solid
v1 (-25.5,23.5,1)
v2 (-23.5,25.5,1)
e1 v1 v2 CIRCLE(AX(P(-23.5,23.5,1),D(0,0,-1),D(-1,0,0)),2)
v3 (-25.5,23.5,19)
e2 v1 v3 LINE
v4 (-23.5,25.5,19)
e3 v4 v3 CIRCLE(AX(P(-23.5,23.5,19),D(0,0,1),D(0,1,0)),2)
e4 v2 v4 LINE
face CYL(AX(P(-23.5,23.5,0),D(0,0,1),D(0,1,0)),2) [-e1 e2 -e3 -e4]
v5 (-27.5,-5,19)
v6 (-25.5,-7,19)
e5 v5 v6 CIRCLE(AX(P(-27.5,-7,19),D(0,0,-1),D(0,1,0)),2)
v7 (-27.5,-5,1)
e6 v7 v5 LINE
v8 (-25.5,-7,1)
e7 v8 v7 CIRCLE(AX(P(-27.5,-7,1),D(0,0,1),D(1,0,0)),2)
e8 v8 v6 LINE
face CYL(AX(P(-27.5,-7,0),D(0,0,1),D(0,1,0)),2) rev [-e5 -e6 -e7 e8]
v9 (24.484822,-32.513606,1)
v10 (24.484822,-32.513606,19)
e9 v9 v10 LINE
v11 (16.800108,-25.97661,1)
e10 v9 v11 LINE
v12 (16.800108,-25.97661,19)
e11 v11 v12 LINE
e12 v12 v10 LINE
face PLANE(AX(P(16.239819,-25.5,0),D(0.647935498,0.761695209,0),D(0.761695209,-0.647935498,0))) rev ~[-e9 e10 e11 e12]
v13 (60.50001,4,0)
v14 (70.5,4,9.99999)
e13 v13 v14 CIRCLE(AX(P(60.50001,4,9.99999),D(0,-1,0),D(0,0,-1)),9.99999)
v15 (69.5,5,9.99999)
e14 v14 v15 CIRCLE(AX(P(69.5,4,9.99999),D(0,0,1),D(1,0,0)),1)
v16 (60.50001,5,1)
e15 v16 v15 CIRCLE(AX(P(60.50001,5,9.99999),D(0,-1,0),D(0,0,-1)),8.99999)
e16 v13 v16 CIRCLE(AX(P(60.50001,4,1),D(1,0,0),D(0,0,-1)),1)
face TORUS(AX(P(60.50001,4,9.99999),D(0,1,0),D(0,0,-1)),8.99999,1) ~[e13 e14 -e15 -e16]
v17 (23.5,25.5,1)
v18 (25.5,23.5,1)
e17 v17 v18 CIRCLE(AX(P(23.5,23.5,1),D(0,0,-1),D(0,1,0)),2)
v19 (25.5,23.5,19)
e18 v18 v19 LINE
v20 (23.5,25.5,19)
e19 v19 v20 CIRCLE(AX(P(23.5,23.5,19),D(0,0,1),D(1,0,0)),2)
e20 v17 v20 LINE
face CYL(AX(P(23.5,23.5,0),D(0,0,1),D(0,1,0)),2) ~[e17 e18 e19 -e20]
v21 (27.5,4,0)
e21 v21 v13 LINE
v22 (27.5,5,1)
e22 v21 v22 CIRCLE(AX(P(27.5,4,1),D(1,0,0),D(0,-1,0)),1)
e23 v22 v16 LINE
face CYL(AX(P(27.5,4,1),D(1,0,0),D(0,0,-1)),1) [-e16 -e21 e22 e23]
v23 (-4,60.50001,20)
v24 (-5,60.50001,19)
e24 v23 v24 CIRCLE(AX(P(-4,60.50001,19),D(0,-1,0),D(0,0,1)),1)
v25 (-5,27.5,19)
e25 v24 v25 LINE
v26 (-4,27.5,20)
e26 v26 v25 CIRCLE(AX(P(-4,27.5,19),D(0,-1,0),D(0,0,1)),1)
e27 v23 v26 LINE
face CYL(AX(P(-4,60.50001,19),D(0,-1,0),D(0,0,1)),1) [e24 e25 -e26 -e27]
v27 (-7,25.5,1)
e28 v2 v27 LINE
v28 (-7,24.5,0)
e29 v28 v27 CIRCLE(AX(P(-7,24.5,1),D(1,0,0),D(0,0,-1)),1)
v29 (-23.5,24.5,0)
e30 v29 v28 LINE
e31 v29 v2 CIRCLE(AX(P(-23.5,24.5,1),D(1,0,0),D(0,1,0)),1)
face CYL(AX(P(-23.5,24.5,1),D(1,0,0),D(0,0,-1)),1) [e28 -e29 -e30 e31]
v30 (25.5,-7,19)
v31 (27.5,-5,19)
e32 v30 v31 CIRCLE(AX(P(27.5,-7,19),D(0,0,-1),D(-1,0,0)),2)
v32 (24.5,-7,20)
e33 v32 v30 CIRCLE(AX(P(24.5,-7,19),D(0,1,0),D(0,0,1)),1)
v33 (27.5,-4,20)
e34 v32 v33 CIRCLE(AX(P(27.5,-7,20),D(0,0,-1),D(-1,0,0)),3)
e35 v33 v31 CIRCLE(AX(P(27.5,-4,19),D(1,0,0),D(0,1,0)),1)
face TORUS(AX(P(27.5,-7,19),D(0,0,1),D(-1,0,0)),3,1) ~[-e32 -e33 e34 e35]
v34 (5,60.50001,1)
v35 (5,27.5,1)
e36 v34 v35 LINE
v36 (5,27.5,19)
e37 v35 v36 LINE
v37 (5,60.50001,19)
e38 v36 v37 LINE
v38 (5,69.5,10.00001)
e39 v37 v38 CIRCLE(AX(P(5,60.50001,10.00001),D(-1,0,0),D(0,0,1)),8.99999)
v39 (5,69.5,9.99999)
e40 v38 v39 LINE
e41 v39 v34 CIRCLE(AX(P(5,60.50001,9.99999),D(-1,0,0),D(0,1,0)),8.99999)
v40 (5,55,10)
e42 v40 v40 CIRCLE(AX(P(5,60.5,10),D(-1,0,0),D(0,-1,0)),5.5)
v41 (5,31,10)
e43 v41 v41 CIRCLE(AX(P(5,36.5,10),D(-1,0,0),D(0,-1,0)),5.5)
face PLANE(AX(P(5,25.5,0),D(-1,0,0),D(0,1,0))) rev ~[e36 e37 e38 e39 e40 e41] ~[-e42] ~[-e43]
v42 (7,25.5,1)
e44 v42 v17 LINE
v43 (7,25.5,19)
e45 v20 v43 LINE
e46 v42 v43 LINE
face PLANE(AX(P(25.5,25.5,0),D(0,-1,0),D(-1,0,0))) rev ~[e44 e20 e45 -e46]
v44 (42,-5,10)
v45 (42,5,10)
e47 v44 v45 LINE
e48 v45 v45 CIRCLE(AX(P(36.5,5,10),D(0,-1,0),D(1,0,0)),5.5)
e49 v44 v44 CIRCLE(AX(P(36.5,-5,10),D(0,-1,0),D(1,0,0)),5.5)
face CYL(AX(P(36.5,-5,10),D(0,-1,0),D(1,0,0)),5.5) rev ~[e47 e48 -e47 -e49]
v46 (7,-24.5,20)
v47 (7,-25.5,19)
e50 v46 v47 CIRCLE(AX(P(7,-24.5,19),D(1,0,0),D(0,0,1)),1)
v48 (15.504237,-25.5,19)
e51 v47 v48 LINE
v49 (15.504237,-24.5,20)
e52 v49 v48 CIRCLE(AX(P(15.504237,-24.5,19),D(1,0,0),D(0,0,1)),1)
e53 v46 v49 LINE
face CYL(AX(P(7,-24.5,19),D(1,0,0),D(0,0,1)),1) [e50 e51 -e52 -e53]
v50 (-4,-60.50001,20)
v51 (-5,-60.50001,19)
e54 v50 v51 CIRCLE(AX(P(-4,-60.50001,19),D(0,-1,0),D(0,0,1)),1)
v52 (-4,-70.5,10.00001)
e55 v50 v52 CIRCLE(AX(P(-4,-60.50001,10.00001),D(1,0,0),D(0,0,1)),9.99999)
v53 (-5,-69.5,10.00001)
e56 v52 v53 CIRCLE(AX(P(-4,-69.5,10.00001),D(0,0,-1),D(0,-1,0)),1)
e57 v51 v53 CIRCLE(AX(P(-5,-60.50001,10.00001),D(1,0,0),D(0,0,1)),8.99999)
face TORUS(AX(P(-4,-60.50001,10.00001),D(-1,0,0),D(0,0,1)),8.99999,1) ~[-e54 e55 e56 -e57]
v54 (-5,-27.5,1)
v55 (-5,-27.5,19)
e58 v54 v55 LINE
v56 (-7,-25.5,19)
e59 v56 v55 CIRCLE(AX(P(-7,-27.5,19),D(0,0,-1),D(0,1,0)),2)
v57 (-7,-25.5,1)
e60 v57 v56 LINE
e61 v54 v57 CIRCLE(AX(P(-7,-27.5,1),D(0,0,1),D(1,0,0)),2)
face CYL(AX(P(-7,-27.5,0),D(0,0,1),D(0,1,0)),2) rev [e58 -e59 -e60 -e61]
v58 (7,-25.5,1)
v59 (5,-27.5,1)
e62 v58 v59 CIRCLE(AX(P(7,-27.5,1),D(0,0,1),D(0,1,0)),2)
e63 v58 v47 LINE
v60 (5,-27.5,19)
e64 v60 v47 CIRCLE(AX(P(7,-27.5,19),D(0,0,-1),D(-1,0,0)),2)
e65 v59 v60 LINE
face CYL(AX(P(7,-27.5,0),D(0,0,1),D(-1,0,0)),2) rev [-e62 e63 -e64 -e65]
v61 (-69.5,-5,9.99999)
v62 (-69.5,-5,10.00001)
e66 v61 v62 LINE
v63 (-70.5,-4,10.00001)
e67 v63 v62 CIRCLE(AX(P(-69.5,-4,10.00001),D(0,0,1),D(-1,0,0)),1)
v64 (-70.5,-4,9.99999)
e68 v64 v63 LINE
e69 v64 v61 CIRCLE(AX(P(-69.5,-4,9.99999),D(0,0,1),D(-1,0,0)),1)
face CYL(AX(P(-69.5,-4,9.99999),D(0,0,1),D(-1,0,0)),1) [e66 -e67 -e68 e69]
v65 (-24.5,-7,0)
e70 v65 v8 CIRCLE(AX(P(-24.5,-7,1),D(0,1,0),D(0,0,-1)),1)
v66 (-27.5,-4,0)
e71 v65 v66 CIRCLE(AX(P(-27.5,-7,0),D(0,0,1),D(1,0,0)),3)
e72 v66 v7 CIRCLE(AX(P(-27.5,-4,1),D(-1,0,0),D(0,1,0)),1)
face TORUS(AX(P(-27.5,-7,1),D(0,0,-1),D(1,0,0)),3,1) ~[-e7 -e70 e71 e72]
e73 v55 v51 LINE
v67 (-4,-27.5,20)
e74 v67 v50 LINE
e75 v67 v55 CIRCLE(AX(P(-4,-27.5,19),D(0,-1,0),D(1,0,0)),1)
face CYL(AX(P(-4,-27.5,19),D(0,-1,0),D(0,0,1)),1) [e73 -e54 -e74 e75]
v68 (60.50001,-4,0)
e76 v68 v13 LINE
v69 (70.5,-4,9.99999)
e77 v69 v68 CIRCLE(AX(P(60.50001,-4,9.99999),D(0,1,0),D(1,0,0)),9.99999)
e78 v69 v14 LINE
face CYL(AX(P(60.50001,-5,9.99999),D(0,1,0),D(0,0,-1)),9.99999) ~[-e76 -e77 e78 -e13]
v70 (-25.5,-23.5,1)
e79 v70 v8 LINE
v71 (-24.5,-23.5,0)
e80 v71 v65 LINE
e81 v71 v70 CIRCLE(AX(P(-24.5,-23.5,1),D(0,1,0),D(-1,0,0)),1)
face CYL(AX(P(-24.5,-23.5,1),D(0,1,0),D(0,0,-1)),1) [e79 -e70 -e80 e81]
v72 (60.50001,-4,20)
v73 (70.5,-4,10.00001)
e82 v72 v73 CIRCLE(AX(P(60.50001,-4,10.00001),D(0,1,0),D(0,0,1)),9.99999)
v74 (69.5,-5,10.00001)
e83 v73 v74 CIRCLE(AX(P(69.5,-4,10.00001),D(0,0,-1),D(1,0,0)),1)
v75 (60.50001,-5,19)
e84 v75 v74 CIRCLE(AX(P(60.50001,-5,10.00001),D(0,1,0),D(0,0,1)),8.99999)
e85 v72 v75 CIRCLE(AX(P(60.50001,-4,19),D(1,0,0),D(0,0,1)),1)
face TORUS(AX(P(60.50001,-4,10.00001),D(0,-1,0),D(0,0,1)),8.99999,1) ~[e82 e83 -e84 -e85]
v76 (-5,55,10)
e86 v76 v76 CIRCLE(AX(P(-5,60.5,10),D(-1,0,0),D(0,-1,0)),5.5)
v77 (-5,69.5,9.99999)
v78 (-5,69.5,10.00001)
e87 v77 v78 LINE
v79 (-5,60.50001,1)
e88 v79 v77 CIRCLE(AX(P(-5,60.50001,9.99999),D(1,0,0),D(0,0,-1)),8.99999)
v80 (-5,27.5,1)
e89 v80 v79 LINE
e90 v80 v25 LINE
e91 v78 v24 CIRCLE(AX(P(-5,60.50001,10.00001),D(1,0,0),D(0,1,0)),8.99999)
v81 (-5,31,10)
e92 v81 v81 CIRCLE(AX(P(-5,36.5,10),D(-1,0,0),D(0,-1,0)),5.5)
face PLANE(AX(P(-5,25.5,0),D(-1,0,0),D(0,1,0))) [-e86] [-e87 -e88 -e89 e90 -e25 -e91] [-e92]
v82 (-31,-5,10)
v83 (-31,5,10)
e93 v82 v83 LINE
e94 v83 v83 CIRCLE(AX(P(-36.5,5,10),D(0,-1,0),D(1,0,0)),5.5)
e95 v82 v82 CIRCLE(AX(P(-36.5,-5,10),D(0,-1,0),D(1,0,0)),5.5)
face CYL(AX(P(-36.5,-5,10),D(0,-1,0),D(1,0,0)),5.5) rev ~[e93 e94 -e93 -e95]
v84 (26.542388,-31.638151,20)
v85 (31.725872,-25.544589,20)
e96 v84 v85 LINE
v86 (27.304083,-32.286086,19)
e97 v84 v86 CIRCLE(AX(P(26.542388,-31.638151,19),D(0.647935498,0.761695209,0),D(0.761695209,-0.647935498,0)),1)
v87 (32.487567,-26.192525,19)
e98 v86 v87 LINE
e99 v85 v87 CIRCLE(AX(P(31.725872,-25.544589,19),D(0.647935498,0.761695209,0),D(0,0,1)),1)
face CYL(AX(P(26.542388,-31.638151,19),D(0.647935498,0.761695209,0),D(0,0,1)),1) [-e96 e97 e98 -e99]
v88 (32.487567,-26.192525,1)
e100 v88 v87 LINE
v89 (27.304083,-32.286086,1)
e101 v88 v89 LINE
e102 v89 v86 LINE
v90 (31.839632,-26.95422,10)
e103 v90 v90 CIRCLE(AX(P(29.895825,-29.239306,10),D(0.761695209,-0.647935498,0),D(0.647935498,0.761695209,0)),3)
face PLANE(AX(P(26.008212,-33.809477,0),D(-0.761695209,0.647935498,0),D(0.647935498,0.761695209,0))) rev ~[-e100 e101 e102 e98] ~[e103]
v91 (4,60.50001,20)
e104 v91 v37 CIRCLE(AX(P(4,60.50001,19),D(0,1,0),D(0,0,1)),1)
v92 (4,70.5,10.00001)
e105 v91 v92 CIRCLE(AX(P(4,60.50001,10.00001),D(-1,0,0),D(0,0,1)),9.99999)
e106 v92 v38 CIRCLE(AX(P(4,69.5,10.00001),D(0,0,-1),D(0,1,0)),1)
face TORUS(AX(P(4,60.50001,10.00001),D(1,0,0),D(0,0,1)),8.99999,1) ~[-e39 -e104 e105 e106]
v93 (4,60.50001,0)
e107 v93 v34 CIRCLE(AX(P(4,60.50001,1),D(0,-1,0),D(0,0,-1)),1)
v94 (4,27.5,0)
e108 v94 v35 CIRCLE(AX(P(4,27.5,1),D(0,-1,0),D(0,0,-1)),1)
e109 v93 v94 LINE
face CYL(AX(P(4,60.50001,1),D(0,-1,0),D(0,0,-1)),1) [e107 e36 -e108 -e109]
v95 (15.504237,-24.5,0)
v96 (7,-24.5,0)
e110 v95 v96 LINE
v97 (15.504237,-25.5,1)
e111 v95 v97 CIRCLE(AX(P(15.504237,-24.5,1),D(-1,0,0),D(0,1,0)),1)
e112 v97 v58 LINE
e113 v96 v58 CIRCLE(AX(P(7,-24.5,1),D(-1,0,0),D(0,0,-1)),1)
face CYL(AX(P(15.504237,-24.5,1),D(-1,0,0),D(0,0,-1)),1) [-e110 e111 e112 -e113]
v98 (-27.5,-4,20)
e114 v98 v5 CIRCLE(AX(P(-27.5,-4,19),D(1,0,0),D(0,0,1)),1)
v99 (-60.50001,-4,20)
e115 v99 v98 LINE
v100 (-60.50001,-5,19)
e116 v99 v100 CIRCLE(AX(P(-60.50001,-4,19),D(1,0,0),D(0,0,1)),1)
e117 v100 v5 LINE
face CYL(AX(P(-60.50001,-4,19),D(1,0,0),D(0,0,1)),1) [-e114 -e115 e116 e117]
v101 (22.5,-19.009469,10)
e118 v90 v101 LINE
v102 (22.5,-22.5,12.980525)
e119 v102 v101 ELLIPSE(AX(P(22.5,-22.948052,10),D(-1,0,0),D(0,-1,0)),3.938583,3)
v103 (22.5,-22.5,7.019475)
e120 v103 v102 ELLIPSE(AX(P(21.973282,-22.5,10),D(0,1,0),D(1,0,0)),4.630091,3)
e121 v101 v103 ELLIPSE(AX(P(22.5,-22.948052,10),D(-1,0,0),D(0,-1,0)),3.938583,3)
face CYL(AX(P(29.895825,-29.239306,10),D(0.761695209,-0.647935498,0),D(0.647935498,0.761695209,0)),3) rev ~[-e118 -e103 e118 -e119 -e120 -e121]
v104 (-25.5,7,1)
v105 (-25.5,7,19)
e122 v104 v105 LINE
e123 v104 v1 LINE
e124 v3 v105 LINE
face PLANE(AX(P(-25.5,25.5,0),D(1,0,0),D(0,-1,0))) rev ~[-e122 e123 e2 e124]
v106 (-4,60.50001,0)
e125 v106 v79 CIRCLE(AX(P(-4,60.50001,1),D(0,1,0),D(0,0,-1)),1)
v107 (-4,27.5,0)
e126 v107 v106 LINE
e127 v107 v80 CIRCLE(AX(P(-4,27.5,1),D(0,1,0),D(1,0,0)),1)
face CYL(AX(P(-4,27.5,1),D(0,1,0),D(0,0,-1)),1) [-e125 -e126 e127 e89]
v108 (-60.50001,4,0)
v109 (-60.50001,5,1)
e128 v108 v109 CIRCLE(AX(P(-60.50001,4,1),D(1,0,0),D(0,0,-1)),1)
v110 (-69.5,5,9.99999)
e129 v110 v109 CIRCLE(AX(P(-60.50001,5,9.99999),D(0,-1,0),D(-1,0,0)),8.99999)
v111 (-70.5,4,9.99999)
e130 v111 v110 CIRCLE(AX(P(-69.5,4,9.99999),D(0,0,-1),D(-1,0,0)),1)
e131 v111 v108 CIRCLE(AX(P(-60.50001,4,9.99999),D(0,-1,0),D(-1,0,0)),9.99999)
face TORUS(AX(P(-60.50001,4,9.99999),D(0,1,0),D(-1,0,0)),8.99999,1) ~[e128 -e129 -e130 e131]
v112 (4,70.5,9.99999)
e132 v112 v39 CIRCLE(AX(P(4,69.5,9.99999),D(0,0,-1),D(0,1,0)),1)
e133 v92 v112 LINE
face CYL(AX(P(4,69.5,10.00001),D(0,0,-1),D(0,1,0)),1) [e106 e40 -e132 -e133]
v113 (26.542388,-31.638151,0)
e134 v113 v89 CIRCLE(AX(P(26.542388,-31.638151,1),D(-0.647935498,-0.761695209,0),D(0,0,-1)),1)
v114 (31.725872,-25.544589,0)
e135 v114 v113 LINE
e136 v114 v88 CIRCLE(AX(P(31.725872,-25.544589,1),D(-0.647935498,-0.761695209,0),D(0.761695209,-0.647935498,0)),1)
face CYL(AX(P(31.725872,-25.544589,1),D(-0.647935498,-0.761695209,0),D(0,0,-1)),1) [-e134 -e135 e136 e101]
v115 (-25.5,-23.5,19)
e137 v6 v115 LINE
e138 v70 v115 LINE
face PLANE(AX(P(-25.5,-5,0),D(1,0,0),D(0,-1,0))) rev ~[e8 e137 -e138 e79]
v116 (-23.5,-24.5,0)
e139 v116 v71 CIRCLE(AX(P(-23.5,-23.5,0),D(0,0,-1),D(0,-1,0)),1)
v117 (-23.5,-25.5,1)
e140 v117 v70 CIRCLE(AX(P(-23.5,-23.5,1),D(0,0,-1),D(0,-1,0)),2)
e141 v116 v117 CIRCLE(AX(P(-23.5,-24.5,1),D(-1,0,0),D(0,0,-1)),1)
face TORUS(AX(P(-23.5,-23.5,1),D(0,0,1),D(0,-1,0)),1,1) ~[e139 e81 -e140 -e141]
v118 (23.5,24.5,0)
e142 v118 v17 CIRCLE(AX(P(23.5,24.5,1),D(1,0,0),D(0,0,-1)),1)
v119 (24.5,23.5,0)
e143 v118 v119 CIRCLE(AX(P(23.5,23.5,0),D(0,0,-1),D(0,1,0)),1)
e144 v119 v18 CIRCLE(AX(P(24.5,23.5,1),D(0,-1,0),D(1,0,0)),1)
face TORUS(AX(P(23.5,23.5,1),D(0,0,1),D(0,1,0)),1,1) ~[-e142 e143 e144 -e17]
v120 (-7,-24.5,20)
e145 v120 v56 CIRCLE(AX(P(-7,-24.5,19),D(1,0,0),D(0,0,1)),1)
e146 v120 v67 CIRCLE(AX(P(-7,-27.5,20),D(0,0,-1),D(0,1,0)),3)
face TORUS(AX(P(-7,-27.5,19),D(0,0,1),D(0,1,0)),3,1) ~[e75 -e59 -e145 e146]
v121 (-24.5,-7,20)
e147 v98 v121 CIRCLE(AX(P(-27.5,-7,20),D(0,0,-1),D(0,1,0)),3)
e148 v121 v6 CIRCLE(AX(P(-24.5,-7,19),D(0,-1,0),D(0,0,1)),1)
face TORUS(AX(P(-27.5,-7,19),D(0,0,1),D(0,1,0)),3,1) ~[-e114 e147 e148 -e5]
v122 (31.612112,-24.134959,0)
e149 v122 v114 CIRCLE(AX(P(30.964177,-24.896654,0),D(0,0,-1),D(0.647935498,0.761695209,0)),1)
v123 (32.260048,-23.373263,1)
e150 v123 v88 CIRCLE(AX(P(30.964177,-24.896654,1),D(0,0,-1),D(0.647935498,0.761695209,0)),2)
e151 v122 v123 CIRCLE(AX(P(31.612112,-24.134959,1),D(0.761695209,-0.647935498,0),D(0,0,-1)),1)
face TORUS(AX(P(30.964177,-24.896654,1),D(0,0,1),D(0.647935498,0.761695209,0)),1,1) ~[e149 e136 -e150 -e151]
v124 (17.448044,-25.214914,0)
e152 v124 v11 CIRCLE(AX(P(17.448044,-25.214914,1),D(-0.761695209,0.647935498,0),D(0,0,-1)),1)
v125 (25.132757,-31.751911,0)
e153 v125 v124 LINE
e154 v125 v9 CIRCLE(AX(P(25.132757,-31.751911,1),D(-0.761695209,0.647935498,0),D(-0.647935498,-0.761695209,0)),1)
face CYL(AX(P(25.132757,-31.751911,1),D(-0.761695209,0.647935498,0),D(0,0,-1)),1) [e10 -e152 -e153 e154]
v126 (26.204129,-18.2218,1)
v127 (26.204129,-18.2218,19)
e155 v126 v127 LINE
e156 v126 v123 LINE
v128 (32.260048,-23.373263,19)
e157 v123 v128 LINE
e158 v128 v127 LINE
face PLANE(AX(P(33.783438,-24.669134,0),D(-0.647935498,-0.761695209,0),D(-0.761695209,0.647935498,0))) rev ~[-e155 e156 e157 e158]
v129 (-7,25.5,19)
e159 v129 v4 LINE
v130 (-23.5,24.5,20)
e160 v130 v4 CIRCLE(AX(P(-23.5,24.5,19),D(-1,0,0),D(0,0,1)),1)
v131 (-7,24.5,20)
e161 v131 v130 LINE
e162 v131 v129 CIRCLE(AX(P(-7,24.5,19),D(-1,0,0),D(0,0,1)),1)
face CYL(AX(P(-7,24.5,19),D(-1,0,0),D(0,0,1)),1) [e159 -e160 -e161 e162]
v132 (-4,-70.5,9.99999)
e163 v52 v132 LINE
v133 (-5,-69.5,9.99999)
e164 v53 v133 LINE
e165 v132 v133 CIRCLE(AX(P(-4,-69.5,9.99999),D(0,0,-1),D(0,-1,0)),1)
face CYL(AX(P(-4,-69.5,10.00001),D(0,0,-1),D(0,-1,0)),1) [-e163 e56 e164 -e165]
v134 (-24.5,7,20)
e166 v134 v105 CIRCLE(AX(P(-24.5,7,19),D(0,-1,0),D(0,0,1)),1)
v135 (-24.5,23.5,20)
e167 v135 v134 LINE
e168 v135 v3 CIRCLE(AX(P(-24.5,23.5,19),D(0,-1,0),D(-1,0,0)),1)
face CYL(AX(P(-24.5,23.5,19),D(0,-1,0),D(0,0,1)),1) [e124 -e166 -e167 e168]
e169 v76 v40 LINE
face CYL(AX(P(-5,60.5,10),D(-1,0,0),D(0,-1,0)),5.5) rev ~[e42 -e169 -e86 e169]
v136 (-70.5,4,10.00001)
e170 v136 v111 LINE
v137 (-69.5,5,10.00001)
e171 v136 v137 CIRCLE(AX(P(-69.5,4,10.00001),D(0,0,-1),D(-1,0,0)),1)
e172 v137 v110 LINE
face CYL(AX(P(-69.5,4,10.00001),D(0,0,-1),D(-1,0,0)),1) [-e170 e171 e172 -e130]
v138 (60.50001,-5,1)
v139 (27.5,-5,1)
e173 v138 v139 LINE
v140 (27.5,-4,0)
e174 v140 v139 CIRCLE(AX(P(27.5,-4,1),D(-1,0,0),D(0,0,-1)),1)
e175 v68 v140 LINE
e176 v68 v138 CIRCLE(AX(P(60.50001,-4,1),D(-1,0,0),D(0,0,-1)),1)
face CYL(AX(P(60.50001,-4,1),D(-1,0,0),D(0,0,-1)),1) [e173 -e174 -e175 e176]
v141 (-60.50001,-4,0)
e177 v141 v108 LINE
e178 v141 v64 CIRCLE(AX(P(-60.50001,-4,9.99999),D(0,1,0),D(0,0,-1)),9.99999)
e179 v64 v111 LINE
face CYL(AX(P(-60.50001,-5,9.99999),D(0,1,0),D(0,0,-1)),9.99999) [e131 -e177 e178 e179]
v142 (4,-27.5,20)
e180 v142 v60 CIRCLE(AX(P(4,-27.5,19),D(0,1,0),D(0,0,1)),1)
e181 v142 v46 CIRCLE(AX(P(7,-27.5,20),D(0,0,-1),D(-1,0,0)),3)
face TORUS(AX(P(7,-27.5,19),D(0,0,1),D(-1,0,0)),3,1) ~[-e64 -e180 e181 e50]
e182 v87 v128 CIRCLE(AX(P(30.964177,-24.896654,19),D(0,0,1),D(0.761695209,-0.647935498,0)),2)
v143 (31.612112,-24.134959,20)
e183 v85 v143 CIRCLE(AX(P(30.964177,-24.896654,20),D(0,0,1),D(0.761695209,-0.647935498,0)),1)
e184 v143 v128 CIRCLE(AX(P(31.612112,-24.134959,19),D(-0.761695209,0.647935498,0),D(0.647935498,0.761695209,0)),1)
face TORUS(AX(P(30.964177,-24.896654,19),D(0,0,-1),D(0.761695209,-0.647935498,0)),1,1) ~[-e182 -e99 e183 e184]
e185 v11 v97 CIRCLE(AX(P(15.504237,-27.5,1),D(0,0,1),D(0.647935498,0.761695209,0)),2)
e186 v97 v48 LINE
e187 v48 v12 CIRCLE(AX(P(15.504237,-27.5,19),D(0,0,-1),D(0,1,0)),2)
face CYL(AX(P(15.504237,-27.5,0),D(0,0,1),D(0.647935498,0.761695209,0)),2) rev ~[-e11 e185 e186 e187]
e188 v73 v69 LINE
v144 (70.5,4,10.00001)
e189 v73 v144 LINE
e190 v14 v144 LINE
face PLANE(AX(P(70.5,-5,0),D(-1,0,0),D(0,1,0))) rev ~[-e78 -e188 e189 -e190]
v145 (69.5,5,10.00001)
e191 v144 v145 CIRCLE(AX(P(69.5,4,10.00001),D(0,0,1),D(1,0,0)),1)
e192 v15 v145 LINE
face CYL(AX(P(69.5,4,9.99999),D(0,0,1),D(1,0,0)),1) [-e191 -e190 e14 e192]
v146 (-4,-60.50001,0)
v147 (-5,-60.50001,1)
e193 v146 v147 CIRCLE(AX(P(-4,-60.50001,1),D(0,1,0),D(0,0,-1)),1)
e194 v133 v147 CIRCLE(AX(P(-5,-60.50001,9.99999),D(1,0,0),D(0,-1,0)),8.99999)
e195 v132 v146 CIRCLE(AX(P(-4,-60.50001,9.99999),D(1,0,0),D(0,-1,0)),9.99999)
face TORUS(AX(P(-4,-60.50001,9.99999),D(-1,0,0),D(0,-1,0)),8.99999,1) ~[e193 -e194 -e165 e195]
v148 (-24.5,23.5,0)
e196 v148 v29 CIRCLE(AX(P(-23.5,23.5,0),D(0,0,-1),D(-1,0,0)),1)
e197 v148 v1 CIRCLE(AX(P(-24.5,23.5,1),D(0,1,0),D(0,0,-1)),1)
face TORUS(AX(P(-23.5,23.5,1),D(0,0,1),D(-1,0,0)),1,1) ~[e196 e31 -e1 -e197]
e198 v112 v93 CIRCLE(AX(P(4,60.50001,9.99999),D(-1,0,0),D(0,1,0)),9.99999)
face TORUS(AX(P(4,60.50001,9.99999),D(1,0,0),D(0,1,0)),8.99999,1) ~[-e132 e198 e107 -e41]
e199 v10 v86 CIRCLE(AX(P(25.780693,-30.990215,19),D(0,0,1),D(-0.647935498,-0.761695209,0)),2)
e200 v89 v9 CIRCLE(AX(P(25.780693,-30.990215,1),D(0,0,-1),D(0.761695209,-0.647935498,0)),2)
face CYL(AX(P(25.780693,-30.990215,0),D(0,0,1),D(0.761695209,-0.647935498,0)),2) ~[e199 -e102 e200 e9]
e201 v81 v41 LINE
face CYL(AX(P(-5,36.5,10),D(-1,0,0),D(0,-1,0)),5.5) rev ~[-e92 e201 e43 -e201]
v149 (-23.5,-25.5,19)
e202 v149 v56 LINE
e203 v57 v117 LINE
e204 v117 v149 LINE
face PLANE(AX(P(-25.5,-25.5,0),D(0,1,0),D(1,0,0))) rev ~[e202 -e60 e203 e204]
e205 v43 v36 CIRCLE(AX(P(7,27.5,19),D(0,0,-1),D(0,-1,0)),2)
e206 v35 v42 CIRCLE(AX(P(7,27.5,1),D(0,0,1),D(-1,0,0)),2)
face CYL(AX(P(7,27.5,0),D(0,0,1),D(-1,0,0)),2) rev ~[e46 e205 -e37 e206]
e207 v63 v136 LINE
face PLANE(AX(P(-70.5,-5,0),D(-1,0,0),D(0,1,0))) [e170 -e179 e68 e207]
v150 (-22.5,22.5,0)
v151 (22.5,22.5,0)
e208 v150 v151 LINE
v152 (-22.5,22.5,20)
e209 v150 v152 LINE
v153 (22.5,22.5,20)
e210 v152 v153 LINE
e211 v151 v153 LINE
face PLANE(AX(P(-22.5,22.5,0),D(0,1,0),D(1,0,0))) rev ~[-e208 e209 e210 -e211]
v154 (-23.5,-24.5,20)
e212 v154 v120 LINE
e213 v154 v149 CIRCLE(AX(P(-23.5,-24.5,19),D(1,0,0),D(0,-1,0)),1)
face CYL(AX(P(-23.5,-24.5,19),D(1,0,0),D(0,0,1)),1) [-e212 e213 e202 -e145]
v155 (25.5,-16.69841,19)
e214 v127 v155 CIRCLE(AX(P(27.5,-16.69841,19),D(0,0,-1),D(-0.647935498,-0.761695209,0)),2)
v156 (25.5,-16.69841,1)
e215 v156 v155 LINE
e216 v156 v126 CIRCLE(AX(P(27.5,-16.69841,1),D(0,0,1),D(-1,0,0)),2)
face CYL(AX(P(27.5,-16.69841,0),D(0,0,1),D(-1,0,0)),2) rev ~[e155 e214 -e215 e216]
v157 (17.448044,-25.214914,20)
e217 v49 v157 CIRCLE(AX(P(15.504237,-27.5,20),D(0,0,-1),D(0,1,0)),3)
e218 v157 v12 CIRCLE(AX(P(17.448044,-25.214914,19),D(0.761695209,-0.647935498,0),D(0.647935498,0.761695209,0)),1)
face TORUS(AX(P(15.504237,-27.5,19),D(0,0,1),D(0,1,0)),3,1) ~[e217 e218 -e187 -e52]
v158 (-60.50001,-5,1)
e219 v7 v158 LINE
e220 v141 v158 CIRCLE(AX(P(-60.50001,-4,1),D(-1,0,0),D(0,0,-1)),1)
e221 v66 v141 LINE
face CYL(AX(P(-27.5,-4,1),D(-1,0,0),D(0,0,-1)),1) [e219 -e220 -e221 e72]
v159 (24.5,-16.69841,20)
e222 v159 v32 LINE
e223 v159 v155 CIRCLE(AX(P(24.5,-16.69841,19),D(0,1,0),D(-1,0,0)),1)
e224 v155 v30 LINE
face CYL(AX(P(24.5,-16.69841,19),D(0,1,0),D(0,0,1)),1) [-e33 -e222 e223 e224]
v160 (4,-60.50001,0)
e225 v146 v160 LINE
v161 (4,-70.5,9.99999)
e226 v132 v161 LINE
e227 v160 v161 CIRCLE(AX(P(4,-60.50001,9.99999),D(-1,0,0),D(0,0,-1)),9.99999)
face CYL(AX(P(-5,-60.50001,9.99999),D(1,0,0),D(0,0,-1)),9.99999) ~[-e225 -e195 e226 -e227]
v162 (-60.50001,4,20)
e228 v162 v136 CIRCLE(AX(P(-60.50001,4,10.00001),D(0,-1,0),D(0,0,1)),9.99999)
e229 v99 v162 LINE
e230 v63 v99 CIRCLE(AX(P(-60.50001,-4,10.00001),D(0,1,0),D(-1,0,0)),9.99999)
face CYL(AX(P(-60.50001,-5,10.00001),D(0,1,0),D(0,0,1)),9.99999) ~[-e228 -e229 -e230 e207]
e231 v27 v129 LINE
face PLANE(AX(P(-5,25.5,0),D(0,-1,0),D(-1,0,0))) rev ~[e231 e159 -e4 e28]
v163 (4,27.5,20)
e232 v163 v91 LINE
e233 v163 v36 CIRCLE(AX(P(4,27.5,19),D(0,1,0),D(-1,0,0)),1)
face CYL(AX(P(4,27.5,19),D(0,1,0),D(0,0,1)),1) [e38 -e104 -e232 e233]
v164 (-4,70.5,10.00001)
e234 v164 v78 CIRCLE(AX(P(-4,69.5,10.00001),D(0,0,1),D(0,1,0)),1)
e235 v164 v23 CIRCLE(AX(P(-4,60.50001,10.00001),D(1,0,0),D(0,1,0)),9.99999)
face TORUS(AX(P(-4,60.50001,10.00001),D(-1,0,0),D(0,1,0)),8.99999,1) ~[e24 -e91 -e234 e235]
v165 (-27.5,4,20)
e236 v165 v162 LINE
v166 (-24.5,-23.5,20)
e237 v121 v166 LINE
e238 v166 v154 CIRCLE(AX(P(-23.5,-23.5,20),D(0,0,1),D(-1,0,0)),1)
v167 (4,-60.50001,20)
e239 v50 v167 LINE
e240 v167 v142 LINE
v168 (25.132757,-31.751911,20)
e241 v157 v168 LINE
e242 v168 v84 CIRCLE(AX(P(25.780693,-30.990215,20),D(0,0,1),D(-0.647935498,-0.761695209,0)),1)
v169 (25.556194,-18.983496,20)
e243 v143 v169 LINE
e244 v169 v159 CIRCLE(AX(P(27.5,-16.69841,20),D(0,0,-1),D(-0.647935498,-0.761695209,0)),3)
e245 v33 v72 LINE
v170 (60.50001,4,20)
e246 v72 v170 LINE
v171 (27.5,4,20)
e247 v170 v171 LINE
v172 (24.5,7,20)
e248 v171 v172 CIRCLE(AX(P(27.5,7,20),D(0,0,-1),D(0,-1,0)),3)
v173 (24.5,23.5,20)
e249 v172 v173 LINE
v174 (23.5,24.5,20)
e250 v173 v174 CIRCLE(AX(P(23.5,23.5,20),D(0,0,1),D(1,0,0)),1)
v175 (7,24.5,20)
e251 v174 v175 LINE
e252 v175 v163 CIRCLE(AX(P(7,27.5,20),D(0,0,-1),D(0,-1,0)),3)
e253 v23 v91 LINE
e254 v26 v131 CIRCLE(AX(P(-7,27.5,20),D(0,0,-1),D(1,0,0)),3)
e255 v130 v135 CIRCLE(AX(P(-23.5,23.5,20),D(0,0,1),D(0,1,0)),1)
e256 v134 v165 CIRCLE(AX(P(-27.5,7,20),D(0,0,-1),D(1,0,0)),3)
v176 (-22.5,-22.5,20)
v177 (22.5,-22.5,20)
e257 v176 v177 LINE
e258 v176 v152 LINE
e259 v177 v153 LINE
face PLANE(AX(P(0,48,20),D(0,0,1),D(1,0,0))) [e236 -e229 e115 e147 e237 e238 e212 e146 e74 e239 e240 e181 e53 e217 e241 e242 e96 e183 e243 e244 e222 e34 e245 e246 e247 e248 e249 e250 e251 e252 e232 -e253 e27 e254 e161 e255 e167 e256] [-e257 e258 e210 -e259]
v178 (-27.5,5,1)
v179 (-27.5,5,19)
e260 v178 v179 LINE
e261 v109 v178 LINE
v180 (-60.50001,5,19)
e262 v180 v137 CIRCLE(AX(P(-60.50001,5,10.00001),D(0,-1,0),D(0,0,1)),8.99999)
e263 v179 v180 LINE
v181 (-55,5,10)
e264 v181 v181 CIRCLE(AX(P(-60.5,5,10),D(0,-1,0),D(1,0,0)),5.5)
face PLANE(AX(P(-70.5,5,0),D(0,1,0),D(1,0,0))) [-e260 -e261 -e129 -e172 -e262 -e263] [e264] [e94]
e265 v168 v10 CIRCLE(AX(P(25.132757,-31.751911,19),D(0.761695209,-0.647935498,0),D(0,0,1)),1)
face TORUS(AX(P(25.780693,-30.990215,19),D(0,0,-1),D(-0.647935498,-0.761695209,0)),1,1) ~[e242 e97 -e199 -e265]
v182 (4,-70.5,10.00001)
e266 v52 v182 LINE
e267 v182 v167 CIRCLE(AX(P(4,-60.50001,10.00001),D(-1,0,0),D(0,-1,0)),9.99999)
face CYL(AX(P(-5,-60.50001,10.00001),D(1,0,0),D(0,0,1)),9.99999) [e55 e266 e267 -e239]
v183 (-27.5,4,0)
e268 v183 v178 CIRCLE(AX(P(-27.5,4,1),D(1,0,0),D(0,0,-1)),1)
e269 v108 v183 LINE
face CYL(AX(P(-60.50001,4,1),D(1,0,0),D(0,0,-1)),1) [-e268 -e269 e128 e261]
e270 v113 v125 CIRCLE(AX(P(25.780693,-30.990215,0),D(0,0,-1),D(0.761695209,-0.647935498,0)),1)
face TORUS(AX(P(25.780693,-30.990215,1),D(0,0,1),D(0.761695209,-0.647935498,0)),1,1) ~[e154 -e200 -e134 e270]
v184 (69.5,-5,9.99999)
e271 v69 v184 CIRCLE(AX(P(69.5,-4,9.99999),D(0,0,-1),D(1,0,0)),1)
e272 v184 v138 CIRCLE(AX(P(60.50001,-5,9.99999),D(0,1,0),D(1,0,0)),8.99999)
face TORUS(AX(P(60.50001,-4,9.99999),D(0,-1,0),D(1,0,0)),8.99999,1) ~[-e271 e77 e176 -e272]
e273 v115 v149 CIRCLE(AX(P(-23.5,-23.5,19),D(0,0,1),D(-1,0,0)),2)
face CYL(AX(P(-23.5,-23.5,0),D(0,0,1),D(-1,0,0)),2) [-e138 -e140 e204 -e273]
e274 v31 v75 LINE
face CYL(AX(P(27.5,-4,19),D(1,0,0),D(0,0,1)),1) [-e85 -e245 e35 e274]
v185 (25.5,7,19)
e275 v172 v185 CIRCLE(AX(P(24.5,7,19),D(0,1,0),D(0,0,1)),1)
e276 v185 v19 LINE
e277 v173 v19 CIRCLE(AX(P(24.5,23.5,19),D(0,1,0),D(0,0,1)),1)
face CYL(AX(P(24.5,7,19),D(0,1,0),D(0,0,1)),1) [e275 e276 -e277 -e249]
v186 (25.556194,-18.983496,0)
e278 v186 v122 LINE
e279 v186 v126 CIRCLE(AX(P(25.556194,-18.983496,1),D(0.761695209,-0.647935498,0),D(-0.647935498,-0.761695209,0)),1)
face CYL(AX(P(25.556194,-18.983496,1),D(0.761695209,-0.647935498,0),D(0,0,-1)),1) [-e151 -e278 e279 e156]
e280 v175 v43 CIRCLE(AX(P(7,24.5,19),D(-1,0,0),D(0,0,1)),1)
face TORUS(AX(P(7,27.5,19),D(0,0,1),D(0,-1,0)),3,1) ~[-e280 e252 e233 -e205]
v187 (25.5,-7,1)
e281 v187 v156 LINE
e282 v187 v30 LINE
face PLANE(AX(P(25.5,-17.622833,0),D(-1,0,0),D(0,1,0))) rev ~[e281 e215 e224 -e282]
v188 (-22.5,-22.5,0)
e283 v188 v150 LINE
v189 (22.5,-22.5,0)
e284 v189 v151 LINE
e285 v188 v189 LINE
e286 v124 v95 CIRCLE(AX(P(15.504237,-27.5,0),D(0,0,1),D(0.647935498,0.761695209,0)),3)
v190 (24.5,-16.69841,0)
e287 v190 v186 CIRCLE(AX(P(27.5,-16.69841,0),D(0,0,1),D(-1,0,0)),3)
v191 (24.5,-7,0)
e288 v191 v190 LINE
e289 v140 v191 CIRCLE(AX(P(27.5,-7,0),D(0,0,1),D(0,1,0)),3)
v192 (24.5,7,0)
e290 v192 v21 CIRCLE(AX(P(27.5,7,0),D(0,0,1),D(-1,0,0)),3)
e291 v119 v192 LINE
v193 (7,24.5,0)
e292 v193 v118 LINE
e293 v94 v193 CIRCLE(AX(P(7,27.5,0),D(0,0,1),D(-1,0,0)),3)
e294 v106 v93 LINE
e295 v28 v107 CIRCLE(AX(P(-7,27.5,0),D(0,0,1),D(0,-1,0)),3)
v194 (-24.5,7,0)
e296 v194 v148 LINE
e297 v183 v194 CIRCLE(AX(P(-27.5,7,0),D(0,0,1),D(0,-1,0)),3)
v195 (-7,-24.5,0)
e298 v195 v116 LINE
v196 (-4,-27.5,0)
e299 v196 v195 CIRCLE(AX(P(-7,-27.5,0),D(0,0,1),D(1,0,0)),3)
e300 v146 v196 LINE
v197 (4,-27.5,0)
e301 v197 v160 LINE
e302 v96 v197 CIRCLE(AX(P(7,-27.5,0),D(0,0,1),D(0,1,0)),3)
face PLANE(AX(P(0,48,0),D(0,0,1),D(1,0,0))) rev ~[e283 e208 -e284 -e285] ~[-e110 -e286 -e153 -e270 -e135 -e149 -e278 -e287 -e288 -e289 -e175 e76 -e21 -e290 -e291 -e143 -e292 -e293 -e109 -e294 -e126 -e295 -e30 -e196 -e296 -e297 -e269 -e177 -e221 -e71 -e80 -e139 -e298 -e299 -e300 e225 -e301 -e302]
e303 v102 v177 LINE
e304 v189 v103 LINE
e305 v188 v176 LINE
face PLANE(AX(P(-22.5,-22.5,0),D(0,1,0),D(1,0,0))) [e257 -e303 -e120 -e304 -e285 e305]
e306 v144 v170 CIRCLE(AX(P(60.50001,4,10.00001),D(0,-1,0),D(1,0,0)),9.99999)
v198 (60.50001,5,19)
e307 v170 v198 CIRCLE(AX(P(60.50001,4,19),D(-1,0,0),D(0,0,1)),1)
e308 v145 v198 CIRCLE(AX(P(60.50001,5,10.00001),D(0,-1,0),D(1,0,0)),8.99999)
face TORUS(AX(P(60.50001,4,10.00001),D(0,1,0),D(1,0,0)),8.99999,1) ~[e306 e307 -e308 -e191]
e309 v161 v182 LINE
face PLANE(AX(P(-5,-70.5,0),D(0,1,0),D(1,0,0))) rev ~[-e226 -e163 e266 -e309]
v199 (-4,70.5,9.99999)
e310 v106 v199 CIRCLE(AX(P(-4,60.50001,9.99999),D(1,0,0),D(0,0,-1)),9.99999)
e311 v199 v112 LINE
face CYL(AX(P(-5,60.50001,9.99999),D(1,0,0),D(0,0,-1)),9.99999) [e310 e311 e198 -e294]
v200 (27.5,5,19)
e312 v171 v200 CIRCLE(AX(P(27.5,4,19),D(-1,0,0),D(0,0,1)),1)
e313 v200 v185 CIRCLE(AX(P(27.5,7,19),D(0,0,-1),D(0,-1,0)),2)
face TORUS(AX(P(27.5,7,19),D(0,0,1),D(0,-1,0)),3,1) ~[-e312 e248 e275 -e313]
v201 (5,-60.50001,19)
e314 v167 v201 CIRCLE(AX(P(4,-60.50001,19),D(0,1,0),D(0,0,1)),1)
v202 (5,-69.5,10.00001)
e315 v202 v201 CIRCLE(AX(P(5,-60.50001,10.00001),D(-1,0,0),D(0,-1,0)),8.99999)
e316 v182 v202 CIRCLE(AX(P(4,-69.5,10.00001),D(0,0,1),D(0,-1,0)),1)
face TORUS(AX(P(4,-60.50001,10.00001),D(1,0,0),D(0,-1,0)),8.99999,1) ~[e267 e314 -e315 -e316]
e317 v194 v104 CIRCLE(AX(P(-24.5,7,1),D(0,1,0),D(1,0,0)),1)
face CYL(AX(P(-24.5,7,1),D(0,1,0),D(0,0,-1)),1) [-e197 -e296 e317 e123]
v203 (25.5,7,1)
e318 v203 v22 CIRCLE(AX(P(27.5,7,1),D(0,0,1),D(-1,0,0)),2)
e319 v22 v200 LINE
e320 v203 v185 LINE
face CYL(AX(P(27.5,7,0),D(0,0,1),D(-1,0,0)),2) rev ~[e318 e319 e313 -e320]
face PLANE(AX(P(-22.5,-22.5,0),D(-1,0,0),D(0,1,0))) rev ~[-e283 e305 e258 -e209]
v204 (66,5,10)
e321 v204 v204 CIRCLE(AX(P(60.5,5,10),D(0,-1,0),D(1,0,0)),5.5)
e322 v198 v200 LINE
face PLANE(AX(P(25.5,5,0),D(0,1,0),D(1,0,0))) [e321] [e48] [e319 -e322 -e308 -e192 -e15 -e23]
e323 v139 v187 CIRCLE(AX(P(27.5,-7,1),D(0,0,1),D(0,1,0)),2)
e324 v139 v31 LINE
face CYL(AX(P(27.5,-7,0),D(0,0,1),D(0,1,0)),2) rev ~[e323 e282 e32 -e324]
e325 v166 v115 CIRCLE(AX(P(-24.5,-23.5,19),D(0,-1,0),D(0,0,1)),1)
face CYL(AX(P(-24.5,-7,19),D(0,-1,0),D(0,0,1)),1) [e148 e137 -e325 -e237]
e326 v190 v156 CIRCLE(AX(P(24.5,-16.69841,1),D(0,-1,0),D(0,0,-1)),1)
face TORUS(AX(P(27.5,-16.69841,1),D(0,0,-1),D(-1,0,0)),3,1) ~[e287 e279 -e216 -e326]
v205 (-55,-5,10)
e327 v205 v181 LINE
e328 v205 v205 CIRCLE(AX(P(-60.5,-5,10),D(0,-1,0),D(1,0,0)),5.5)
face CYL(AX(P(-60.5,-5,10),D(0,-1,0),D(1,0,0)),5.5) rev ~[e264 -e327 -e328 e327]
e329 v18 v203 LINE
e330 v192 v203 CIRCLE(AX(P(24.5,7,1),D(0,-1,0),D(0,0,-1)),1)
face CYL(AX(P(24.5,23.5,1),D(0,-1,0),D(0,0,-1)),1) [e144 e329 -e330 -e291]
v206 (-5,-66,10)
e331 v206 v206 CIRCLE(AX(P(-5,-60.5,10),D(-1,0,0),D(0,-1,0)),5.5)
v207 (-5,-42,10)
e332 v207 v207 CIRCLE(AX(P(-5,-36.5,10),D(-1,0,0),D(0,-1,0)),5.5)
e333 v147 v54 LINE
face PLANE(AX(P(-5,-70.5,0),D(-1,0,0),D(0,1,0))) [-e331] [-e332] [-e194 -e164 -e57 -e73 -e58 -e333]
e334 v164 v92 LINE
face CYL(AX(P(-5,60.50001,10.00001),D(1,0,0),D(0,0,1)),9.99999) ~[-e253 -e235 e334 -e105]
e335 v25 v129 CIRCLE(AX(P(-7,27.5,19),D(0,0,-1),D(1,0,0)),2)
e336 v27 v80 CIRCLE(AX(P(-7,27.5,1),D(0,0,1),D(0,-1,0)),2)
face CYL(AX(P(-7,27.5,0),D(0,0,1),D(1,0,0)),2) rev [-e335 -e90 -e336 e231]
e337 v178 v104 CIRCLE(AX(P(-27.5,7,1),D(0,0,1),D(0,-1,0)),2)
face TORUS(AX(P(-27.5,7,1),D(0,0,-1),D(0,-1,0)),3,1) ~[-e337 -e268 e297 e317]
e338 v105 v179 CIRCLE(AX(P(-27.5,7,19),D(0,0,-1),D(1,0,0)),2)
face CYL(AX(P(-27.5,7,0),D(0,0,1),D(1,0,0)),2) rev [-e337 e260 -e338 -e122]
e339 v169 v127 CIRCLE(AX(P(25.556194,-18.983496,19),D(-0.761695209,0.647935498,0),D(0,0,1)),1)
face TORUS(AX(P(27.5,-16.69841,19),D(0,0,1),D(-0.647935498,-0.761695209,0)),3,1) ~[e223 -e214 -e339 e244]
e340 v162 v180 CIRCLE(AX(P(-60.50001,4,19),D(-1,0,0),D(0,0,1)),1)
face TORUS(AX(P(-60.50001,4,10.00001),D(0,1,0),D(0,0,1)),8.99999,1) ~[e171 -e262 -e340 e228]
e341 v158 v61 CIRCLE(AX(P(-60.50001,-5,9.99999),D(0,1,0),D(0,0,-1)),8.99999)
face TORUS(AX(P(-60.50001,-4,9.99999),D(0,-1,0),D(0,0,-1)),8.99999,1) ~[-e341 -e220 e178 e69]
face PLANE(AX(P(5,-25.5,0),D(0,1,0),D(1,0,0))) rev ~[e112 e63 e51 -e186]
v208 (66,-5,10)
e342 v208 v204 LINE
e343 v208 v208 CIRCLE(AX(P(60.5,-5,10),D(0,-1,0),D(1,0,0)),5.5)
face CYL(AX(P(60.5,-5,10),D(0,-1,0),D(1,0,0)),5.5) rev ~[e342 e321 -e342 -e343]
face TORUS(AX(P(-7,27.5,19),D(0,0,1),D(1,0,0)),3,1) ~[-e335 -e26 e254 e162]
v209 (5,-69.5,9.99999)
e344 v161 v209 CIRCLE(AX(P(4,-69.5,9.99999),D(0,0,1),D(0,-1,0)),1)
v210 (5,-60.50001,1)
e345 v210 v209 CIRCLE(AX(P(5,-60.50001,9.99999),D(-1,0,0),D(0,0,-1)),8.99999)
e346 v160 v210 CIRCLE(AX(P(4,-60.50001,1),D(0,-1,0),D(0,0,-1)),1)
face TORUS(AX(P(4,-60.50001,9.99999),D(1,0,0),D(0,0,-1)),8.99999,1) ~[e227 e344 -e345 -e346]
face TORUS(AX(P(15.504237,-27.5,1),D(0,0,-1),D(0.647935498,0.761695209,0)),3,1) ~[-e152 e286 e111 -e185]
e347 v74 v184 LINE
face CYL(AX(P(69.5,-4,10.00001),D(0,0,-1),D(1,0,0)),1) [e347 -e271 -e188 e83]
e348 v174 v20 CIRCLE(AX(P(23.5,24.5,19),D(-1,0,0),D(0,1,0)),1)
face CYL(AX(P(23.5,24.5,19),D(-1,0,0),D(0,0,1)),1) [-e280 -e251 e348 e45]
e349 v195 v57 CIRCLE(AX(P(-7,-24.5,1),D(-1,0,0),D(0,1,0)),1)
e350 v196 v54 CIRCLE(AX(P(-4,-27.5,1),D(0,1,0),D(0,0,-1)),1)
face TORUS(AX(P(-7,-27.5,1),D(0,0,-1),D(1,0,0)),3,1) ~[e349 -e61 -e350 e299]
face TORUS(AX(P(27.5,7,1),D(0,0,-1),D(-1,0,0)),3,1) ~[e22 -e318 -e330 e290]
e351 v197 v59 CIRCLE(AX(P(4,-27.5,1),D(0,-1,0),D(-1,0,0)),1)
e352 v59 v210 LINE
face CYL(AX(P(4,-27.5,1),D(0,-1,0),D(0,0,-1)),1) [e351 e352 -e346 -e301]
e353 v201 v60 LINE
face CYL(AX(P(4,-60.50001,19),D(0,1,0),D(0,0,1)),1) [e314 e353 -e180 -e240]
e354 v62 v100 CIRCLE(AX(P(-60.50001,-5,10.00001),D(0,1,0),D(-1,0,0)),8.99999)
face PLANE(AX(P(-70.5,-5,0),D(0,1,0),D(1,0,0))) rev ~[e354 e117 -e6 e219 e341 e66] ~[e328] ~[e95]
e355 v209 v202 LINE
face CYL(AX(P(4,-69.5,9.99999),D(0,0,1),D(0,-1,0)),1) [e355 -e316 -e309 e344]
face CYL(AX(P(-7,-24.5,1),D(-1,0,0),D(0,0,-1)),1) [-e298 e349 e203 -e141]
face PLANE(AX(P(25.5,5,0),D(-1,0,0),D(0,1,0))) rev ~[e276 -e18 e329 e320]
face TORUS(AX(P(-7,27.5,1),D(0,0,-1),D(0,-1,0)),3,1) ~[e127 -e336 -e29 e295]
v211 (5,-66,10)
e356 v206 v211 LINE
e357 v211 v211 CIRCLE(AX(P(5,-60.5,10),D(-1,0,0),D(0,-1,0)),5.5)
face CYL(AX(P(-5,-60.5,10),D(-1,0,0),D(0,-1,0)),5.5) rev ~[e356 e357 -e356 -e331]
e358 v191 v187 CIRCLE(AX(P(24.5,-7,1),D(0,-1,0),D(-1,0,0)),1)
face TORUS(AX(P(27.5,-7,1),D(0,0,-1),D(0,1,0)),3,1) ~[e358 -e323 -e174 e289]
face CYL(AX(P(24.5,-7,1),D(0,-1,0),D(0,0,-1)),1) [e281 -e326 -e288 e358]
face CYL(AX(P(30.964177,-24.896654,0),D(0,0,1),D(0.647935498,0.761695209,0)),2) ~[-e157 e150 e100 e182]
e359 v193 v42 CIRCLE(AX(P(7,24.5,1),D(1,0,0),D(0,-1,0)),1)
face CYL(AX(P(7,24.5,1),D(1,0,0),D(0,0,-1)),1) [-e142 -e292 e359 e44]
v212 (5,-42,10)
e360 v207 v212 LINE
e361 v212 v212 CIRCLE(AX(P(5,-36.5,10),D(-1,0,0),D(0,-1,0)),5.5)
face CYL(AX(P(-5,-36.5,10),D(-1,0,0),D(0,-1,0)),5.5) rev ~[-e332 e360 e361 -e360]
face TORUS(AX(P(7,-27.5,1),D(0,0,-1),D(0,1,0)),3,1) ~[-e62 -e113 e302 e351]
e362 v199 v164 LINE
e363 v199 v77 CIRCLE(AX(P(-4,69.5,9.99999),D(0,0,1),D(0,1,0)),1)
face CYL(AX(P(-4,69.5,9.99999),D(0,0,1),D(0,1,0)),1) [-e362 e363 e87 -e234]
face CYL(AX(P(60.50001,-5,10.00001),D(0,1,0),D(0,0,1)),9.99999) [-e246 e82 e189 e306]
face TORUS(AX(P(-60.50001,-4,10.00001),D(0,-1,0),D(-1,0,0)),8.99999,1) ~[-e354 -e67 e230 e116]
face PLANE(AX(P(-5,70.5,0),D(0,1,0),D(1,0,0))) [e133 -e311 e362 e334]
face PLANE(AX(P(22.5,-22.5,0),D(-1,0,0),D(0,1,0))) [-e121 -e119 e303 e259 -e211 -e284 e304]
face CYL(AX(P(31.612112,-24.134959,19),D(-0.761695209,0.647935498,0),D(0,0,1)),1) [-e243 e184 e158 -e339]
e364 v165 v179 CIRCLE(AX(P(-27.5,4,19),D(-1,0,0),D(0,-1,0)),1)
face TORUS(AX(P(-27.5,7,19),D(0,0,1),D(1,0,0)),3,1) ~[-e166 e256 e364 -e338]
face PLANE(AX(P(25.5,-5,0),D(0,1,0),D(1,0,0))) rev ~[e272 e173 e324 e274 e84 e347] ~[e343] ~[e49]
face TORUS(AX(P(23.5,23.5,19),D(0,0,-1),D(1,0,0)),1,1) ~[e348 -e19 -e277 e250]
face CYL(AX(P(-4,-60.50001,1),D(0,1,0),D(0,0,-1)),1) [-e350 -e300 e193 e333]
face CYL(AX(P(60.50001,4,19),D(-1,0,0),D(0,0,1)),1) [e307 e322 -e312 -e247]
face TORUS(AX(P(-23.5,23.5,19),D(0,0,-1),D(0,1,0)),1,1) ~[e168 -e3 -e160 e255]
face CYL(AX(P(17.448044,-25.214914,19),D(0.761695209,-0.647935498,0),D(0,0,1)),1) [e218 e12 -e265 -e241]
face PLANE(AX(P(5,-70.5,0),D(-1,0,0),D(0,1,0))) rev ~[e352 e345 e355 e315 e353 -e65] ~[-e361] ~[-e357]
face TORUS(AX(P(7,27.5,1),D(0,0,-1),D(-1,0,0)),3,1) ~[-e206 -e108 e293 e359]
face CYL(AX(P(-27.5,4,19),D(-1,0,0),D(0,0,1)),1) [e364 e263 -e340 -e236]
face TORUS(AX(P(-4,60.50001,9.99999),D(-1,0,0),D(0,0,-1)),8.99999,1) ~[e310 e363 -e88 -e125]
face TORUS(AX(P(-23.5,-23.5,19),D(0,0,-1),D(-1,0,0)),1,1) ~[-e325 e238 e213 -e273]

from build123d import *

# Parameters (mm, degrees)
F0_W     = 10
F0_H     = 45
F0_W_2   = 45
F0_H_2   = 10
F1_DEPTH = 20
F2_R     = 5.5
F3_DEPTH = 10
F4_R     = 5.5
F5_DEPTH = 10
F6_R     = 9.99999
F7_R     = 3
F8_DEPTH = 25
F9_R     = 2
F10_R    = 1


# Not quite as in the source:
# - a fillet or chamfer is up to 0.001 mm smaller than in the source, because OpenCascade refuses the exact size


with BuildPart() as f1:
    # F0 (on Top) → F1 (new body)
    with BuildSketch(Plane.XY):
        with Locations((0, 48)):
            Rectangle(F0_W, F0_H)
        with Locations((-48, 0)):
            Rectangle(F0_W_2, F0_H_2)
        with Locations((0, -48)):
            Rectangle(F0_W, F0_H)
        with Locations((48, 0)):
            Rectangle(F0_W_2, F0_H_2)
        Polygon((5, 25.5), (-5, 25.5), (-25.5, 25.5), (-25.5, 5), (-25.5, -5), (-25.5, -25.5), (-5, -25.5), (5, -25.5), (16.2398189751, -25.5), (25.5, -25.5), (25.5, -17.6228334755), (25.5, -5), (25.5, 5), (25.5, 25.5), align=None)
        Rectangle(F0_W_2, F0_H, mode=Mode.SUBTRACT)
        Polygon((33.7834382075, -24.6691344042), (25.5, -17.6228334755), (25.5, -25.5), (16.2398189751, -25.5), (26.0082122366, -33.8094769088), align=None)
    extrude(amount=F1_DEPTH)

    # F2 (on face) → F3 (cut)
    with BuildSketch(Plane.XZ.offset(5)):
        with Locations((36.5, 10)):
            Circle(F2_R)
        with Locations((60.5, 10)):
            Circle(F2_R)
        with Locations((-36.5, 10)):
            Circle(F2_R)
        with Locations((-60.5, 10)):
            Circle(F2_R)
    extrude(amount=-F3_DEPTH, mode=Mode.SUBTRACT)

    # F4 (on face) → F5 (cut)
    with BuildSketch(Plane(origin=(-5, 0, 0), x_dir=(0, -1, 0), z_dir=(-1, 0, 0))):
        with Locations((36.5, 10)):
            Circle(F4_R)
        with Locations((60.5, 10)):
            Circle(F4_R)
        with Locations((-36.5, 10)):
            Circle(F4_R)
        with Locations((-60.5, 10)):
            Circle(F4_R)
    extrude(amount=-F5_DEPTH, mode=Mode.SUBTRACT)

    # F6 (radius 10 in the source; OpenCascade refuses exactly that, so slightly less here)
    f6_edges = [f1.edges().sort_by_distance(p)[0] for p in [
        (0, 70.5, 20),
        (0, 70.5, 0),
        (-70.5, 0, 0),
        (0, -70.5, 20),
        (70.5, 0, 20),
        (-70.5, 0, 20),
        (0, -70.5, 0),
        (70.5, 0, 0),
    ]]
    fillet(f6_edges, radius=F6_R)

    # F7 (on face) → F8 (cut)
    with BuildSketch(Plane(origin=(31.7754035757, -27.02972487, 0), x_dir=(0.6479354976, 0.7616952087, 0), z_dir=(0.7616952087, -0.6479354976, 0))):
        with Locations((-2.9008726342, 10)):
            Circle(F7_R)
    extrude(amount=-F8_DEPTH, mode=Mode.SUBTRACT)

    # F9
    f9_edges = [f1.edges().sort_by_distance(p)[0] for p in [
        (-25.5, -5, 10),
        (-5, -25.5, 10),
        (16.239819, -25.5, 10),
        (5, -25.5, 10),
        (-5, 25.5, 10),
        (-25.5, 5, 10),
        (5, 25.5, 10),
        (25.5, 5, 10),
        (25.5, -17.622833, 10),
        (25.5, -5, 10),
        (-25.5, -25.5, 10),
        (25.5, 25.5, 10),
        (-25.5, 25.5, 10),
        (26.008212, -33.809477, 10),
        (33.783438, -24.669134, 10),
    ]]
    fillet(f9_edges, radius=F9_R)

    # F10
    f10_edges = [f1.edges().sort_by_distance(p)[0] for p in [
        (-15.25, 25.5, 20),
        (-25.5, 15.25, 20),
        (-25.5, -15.25, 20),
        (-15.25, -25.5, 20),
        (11.252119, -25.5, 20),
        (29.895825, -29.239306, 20),
        (25.5, -11.849205, 20),
        (25.5, 15.25, 20),
        (15.25, 25.5, 20),
        (24.484822, -32.513606, 10),
        (32.260048, -23.373263, 10),
    ]]
    fillet(f10_edges, radius=F10_R)


solid = f1.part
